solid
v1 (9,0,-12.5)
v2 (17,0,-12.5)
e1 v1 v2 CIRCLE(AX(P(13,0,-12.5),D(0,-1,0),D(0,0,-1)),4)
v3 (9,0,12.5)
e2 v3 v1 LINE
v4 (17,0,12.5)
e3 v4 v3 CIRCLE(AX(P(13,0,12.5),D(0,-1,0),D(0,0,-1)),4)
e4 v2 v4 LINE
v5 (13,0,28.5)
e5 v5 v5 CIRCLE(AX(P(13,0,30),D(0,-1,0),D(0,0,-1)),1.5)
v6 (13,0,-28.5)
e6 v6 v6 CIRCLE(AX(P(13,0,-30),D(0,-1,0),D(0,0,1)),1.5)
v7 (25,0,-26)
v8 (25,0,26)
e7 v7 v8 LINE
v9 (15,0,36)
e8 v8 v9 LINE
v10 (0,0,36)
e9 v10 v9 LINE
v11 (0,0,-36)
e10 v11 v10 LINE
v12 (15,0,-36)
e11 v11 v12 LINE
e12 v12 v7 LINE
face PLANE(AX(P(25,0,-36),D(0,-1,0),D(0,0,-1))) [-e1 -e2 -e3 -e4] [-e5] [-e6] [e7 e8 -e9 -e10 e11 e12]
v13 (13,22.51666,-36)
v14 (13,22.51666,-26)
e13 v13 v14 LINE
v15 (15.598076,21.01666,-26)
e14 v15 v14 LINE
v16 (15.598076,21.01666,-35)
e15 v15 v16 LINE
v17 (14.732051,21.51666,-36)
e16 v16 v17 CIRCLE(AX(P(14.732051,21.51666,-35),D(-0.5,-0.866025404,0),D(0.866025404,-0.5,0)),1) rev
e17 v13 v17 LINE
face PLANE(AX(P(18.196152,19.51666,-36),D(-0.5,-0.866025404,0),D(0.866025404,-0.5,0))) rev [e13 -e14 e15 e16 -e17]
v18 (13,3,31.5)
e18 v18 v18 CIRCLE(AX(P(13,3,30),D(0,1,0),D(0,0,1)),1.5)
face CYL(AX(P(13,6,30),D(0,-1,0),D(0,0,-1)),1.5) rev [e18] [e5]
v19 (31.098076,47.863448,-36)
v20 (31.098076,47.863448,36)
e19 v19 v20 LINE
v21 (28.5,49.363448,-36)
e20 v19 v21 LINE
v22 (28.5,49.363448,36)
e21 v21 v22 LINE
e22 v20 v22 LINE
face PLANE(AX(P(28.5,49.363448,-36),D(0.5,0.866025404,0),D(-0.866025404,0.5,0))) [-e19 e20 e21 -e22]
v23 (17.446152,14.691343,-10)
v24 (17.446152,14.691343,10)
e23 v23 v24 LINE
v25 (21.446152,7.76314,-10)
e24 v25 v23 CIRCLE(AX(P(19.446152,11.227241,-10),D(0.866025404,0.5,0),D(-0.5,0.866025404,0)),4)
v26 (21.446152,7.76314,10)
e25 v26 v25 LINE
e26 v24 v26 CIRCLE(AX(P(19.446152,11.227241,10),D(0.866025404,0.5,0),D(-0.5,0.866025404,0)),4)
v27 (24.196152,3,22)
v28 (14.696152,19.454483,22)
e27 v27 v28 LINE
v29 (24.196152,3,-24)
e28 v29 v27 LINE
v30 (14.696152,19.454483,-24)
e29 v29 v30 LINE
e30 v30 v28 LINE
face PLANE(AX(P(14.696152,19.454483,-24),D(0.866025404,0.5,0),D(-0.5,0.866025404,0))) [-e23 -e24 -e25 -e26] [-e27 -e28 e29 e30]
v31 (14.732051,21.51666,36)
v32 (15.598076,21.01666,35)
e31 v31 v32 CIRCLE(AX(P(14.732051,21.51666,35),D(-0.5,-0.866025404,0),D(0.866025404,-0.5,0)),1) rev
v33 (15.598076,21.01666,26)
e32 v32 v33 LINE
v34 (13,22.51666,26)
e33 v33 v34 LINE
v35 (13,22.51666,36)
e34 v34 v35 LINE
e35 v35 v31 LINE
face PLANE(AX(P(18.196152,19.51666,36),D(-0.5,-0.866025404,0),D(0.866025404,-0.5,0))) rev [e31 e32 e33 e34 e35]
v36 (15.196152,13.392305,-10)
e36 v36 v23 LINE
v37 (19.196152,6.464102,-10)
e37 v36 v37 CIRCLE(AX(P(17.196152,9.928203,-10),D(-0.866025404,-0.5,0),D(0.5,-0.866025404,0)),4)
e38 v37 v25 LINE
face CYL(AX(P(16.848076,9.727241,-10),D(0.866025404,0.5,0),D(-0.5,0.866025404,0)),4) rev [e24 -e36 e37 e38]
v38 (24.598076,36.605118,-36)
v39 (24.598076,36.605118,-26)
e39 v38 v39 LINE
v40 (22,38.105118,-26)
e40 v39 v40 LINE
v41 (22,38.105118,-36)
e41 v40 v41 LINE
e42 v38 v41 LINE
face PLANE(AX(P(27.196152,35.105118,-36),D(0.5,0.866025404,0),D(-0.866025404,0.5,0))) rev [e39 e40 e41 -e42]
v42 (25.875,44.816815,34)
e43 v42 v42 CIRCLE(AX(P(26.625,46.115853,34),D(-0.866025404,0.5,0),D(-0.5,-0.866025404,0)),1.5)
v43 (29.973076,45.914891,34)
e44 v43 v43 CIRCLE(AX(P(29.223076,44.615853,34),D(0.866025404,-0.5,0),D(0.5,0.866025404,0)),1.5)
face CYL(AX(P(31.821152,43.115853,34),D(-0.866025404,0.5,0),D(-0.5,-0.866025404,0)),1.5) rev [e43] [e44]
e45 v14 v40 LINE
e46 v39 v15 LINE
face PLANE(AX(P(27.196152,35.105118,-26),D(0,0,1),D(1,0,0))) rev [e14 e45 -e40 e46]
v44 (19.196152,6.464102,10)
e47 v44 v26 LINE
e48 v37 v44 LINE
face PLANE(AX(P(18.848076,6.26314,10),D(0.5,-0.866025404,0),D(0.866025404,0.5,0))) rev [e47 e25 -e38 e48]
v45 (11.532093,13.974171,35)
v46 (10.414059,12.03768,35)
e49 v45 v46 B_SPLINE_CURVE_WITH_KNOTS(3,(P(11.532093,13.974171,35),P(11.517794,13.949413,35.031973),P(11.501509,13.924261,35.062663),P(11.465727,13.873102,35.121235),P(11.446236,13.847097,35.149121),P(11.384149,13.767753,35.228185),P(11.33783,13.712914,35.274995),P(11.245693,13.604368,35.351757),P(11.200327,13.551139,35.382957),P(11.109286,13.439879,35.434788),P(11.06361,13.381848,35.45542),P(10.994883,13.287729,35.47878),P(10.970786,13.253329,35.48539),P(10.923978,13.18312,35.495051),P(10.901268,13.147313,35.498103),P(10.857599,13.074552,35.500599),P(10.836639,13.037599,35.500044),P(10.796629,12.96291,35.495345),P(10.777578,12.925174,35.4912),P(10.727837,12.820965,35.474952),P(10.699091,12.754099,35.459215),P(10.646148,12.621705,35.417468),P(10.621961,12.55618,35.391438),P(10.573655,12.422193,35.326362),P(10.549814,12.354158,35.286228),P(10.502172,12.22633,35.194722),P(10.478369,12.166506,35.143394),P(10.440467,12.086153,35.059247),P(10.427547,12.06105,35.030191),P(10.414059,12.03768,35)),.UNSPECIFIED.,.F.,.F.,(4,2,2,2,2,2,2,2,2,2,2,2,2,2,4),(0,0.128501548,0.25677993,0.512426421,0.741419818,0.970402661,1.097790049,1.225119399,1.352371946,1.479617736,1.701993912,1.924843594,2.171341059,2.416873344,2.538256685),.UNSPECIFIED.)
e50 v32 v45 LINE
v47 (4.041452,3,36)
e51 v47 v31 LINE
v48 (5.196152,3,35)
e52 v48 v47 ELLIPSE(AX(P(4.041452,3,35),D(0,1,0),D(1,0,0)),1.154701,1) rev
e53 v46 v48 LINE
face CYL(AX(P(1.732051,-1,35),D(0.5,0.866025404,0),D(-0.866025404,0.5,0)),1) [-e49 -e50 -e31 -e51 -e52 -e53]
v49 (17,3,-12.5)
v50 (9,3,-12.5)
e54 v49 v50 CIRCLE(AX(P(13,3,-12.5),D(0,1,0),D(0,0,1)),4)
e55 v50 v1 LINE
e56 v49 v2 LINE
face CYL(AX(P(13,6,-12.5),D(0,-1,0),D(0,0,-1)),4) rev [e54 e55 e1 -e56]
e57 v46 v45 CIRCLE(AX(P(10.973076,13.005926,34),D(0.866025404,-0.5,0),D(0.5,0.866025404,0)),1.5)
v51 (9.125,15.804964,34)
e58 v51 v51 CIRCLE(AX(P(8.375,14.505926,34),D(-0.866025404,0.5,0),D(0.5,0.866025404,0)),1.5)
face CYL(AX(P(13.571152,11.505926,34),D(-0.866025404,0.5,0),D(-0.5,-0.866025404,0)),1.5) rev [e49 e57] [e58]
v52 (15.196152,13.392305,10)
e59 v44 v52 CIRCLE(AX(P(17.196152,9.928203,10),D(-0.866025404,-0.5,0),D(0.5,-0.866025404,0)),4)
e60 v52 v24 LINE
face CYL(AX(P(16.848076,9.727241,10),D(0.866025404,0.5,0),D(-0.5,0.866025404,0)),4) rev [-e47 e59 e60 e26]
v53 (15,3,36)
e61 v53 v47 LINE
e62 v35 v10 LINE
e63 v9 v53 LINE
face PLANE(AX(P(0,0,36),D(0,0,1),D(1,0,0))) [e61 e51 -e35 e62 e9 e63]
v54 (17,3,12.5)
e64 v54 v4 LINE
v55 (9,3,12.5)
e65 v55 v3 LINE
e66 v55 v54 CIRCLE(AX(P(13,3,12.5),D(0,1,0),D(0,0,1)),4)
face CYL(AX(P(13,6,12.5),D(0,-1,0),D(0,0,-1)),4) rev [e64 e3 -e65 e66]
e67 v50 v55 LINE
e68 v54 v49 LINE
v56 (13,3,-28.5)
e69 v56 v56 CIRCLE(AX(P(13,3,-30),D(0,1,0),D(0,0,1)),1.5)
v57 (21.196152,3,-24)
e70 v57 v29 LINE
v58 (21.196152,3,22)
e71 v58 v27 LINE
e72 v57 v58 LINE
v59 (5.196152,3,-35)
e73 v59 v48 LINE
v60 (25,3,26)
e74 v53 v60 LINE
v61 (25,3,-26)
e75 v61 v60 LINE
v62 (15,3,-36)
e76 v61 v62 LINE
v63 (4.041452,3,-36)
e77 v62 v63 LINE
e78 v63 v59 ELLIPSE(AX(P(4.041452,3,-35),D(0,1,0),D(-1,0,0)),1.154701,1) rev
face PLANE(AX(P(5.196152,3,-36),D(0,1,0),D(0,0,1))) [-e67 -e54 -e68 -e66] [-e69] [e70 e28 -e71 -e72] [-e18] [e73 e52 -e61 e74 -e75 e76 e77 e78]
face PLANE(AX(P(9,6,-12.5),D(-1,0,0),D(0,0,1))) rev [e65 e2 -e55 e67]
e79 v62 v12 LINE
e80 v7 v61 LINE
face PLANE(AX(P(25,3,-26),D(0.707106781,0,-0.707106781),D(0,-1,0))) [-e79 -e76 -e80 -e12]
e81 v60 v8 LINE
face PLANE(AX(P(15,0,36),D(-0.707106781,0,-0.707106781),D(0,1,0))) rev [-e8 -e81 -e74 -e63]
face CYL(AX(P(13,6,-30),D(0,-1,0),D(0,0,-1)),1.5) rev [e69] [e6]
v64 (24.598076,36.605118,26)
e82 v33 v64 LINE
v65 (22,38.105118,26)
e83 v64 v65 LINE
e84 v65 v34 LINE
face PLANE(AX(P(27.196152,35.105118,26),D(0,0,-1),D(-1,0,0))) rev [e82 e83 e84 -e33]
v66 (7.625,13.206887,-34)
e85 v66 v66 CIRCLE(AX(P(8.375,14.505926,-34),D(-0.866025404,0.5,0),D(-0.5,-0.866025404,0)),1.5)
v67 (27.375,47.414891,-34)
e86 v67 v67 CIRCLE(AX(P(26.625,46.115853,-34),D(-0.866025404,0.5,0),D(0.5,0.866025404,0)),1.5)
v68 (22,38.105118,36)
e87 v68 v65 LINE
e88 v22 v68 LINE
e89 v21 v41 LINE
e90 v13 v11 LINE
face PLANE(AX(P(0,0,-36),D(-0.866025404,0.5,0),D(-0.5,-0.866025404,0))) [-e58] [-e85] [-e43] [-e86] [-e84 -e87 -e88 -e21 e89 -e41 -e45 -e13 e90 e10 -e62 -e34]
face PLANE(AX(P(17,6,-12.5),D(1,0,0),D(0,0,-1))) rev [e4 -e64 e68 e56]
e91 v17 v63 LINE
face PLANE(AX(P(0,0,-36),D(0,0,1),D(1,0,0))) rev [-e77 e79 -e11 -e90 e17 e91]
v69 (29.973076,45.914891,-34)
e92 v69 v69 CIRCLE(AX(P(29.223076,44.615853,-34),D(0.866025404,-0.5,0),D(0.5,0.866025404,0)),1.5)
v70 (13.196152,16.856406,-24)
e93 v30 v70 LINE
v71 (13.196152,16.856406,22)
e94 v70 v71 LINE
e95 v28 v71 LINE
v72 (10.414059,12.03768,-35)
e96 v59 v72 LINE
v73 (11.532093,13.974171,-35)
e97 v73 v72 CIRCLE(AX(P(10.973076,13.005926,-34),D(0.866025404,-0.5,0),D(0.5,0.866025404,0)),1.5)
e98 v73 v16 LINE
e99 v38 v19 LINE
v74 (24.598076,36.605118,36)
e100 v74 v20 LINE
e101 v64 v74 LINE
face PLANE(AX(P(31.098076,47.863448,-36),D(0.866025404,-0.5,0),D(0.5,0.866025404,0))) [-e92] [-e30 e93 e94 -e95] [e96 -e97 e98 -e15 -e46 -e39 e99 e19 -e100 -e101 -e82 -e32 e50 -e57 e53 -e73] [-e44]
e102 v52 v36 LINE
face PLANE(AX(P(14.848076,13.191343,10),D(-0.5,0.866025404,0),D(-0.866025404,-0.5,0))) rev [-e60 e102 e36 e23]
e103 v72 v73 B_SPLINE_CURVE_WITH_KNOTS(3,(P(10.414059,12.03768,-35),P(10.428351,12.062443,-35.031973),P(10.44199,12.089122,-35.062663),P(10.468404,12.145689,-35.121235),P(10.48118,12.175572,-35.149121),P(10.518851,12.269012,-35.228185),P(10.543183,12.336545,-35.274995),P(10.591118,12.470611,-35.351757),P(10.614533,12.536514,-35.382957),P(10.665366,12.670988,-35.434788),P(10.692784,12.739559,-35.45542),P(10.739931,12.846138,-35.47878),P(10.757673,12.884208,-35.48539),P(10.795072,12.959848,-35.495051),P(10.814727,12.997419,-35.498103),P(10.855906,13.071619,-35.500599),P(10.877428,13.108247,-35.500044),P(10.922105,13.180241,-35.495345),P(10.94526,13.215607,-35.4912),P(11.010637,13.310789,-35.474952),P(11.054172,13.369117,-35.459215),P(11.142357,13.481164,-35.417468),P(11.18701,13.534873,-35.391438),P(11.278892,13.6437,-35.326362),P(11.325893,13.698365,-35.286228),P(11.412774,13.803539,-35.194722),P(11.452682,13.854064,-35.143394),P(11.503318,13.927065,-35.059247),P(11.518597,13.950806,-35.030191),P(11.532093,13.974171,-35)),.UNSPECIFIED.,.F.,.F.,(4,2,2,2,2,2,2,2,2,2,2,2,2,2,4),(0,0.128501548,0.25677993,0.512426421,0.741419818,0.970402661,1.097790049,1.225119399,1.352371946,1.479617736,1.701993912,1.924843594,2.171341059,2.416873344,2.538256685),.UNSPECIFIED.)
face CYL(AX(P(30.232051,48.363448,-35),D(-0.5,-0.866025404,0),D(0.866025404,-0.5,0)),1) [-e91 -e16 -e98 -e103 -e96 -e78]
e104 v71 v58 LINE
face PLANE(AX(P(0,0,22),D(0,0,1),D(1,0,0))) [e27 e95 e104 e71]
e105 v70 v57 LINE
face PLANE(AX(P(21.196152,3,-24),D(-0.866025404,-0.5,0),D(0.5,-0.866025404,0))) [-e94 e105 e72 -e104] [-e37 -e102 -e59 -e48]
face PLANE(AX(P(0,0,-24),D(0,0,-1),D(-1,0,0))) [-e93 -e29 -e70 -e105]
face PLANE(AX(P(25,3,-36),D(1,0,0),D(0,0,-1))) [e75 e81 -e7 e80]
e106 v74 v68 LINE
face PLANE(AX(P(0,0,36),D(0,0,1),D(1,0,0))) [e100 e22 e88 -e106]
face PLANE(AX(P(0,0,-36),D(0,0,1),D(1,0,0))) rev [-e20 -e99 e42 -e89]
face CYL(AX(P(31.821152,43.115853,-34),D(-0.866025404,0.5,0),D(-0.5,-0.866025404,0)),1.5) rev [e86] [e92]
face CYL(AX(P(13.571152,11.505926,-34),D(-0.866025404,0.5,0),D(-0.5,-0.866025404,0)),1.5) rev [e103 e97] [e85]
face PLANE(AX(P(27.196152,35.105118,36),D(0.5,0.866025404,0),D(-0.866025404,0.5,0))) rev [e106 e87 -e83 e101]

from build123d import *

# Parameters (mm, degrees)
EXTRUDE_1_DEPTH      = 36
EXTRUDE_1_DEPTH_BACK = 36
EXTRUDE_2_DEPTH      = 60
SKETCH_4_R           = 1.5
SKETCH_4_W           = 10
SKETCH_4_H           = 18
CUT_EXTRUDE_1_DEPTH  = 6
CUT_EXTRUDE_3_DEPTH  = 14
SKETCH_9_R           = 1.5
CUT_EXTRUDE_5_DEPTH  = 6
CUT_EXTRUDE_6_DEPTH  = 3
FILLET_1_R           = 1
CHAMFER_1_SIZE       = 10


with BuildPart() as part:
    # 草图2 → 凸台-拉伸1 (new, two sides: drawn at the far end of the back side and taken through both)
    with BuildSketch(Plane.XY.offset(-EXTRUDE_1_DEPTH_BACK)):
        Polygon((0, 0), (28.5, 49.363448016), (31.098076211, 47.863448016), (5.196152423, 3), (25, 3), (25, 0), align=None)
    extrude(amount=EXTRUDE_1_DEPTH + EXTRUDE_1_DEPTH_BACK)

    # 草图3 → 凸台-拉伸2 (add)
    with BuildSketch(Plane.XY.offset(36)):
        Polygon((13.196152423, 16.856406461), (14.696152423, 19.454482672), (24.196152423, 3), (21.196152423, 3), align=None)
    extrude(amount=-EXTRUDE_2_DEPTH)

    # 草图4 → 切除-拉伸1 (cut)
    with BuildSketch(Plane(origin=(0, 0, 0), x_dir=(0, 0, 1), z_dir=(-0.8660254037844365, 0.500000000000004, 0))):
        with Locations(Location((34, 53.25, 0), (0, 0, 270))):
            Circle(SKETCH_4_R)
        with Locations(Location((34, 16.75, 0), (0, 0, 90))):
            Circle(SKETCH_4_R)
        with Locations(Location((-34, 16.75, 0), (0, 0, 270))):
            Circle(SKETCH_4_R)
        with Locations(Location((-34, 53.25, 0), (0, 0, 90))):
            Circle(SKETCH_4_R)
        with Locations((31, 35)):
            Rectangle(SKETCH_4_W, SKETCH_4_H)
        with Locations((-31, 35)):
            Rectangle(SKETCH_4_W, SKETCH_4_H)
    extrude(amount=-CUT_EXTRUDE_1_DEPTH, mode=Mode.SUBTRACT)

    # 草图6 → 切除-拉伸3 (cut)
    with BuildSketch(Plane.XY.offset(36)):
        Polygon((24.196152423, 3), (14.696152423, 19.454482672), (13.196152423, 16.856406461), (21.196152423, 3), align=None)
    extrude(amount=-CUT_EXTRUDE_3_DEPTH, mode=Mode.SUBTRACT)

    # 草图9 → 切除-拉伸5 (cut)
    with BuildSketch(Plane.XZ):
        with Locations(Location((13, 30, 0), (0, 0, 270))):
            Circle(SKETCH_9_R)
        with Locations(Location((13, -30, 0), (0, 0, 90))):
            Circle(SKETCH_9_R)
        with BuildLine():
            Line((9, -12.5), (9, 12.5))
            ThreePointArc((9, 12.5), (13, 16.5), (17, 12.5))
            Line((17, 12.5), (17, -12.5))
            ThreePointArc((17, -12.5), (13, -16.5), (9, -12.5))
        make_face()
    extrude(amount=-CUT_EXTRUDE_5_DEPTH, mode=Mode.SUBTRACT)

    # 草图11 → 切除-拉伸6 (cut)
    with BuildSketch(Plane(origin=(19.446152423, 11.227241336, 0), x_dir=(0, 0, -1), z_dir=(0.8660254037844374, 0.5000000000000022, 0))):
        with BuildLine():
            Line((-10, 4), (10, 4))
            ThreePointArc((10, 4), (14, 0), (10, -4))
            Line((10, -4), (-10, -4))
            ThreePointArc((-10, -4), (-14, 0), (-10, 4))
        make_face()
    extrude(amount=-CUT_EXTRUDE_6_DEPTH, mode=Mode.SUBTRACT)

    # 圆角1
    # the kernel refuses this fillet: 1 mm, written as the material it takes off along each edge
    with BuildSketch(Plane(origin=(16.848076211, 23.181724008, -36), x_dir=(-0.8660254037844364, 0.500000000000004, 0), z_dir=(-0.5000000000000039, -0.8660254037844364, 0))) as fillet_1_piece_1_section:
        with BuildLine():
            CenterArc((FILLET_1_R, -FILLET_1_R), FILLET_1_R, 90, 90)
            Line((0, -FILLET_1_R), (0, 0))
            Line((0, 0), (FILLET_1_R, 0))
        make_face()
    fillet_1_piece_1 = extrude(amount=25.803847577, mode=Mode.PRIVATE)
    fillet_1_piece_1 = split(fillet_1_piece_1, bisect_by=Plane(origin=(10.79221618, 3, -35.774281329), z_dir=(0, 1, 0)), keep=Keep.TOP, mode=Mode.PRIVATE)
    add(fillet_1_piece_1, mode=Mode.SUBTRACT)
    with BuildSketch(Plane(origin=(3.946152423, 0.834936491, 36), x_dir=(-0.8660254037844366, 0.5000000000000037, 0), z_dir=(0.5000000000000037, 0.8660254037844366, 0))) as fillet_1_piece_2_section:
        with BuildLine():
            CenterArc((FILLET_1_R, -FILLET_1_R), FILLET_1_R, 90, 90)
            Line((0, -FILLET_1_R), (0, 0))
            Line((0, 0), (FILLET_1_R, 0))
        make_face()
    fillet_1_piece_2 = extrude(amount=25.803847577, mode=Mode.PRIVATE)
    fillet_1_piece_2 = split(fillet_1_piece_2, bisect_by=Plane(origin=(10.79221618, 3, 35.774281329), z_dir=(0, 1, 0)), keep=Keep.TOP, mode=Mode.PRIVATE)
    add(fillet_1_piece_2, mode=Mode.SUBTRACT)

    # 倒角1
    chamfer_1_edges = [part.edges().sort_by_distance(p)[0] for p in [
        (25, 1.5, 36),
        (25, 1.5, -36),
    ]]
    chamfer(chamfer_1_edges, length=CHAMFER_1_SIZE)


solid = part.part
